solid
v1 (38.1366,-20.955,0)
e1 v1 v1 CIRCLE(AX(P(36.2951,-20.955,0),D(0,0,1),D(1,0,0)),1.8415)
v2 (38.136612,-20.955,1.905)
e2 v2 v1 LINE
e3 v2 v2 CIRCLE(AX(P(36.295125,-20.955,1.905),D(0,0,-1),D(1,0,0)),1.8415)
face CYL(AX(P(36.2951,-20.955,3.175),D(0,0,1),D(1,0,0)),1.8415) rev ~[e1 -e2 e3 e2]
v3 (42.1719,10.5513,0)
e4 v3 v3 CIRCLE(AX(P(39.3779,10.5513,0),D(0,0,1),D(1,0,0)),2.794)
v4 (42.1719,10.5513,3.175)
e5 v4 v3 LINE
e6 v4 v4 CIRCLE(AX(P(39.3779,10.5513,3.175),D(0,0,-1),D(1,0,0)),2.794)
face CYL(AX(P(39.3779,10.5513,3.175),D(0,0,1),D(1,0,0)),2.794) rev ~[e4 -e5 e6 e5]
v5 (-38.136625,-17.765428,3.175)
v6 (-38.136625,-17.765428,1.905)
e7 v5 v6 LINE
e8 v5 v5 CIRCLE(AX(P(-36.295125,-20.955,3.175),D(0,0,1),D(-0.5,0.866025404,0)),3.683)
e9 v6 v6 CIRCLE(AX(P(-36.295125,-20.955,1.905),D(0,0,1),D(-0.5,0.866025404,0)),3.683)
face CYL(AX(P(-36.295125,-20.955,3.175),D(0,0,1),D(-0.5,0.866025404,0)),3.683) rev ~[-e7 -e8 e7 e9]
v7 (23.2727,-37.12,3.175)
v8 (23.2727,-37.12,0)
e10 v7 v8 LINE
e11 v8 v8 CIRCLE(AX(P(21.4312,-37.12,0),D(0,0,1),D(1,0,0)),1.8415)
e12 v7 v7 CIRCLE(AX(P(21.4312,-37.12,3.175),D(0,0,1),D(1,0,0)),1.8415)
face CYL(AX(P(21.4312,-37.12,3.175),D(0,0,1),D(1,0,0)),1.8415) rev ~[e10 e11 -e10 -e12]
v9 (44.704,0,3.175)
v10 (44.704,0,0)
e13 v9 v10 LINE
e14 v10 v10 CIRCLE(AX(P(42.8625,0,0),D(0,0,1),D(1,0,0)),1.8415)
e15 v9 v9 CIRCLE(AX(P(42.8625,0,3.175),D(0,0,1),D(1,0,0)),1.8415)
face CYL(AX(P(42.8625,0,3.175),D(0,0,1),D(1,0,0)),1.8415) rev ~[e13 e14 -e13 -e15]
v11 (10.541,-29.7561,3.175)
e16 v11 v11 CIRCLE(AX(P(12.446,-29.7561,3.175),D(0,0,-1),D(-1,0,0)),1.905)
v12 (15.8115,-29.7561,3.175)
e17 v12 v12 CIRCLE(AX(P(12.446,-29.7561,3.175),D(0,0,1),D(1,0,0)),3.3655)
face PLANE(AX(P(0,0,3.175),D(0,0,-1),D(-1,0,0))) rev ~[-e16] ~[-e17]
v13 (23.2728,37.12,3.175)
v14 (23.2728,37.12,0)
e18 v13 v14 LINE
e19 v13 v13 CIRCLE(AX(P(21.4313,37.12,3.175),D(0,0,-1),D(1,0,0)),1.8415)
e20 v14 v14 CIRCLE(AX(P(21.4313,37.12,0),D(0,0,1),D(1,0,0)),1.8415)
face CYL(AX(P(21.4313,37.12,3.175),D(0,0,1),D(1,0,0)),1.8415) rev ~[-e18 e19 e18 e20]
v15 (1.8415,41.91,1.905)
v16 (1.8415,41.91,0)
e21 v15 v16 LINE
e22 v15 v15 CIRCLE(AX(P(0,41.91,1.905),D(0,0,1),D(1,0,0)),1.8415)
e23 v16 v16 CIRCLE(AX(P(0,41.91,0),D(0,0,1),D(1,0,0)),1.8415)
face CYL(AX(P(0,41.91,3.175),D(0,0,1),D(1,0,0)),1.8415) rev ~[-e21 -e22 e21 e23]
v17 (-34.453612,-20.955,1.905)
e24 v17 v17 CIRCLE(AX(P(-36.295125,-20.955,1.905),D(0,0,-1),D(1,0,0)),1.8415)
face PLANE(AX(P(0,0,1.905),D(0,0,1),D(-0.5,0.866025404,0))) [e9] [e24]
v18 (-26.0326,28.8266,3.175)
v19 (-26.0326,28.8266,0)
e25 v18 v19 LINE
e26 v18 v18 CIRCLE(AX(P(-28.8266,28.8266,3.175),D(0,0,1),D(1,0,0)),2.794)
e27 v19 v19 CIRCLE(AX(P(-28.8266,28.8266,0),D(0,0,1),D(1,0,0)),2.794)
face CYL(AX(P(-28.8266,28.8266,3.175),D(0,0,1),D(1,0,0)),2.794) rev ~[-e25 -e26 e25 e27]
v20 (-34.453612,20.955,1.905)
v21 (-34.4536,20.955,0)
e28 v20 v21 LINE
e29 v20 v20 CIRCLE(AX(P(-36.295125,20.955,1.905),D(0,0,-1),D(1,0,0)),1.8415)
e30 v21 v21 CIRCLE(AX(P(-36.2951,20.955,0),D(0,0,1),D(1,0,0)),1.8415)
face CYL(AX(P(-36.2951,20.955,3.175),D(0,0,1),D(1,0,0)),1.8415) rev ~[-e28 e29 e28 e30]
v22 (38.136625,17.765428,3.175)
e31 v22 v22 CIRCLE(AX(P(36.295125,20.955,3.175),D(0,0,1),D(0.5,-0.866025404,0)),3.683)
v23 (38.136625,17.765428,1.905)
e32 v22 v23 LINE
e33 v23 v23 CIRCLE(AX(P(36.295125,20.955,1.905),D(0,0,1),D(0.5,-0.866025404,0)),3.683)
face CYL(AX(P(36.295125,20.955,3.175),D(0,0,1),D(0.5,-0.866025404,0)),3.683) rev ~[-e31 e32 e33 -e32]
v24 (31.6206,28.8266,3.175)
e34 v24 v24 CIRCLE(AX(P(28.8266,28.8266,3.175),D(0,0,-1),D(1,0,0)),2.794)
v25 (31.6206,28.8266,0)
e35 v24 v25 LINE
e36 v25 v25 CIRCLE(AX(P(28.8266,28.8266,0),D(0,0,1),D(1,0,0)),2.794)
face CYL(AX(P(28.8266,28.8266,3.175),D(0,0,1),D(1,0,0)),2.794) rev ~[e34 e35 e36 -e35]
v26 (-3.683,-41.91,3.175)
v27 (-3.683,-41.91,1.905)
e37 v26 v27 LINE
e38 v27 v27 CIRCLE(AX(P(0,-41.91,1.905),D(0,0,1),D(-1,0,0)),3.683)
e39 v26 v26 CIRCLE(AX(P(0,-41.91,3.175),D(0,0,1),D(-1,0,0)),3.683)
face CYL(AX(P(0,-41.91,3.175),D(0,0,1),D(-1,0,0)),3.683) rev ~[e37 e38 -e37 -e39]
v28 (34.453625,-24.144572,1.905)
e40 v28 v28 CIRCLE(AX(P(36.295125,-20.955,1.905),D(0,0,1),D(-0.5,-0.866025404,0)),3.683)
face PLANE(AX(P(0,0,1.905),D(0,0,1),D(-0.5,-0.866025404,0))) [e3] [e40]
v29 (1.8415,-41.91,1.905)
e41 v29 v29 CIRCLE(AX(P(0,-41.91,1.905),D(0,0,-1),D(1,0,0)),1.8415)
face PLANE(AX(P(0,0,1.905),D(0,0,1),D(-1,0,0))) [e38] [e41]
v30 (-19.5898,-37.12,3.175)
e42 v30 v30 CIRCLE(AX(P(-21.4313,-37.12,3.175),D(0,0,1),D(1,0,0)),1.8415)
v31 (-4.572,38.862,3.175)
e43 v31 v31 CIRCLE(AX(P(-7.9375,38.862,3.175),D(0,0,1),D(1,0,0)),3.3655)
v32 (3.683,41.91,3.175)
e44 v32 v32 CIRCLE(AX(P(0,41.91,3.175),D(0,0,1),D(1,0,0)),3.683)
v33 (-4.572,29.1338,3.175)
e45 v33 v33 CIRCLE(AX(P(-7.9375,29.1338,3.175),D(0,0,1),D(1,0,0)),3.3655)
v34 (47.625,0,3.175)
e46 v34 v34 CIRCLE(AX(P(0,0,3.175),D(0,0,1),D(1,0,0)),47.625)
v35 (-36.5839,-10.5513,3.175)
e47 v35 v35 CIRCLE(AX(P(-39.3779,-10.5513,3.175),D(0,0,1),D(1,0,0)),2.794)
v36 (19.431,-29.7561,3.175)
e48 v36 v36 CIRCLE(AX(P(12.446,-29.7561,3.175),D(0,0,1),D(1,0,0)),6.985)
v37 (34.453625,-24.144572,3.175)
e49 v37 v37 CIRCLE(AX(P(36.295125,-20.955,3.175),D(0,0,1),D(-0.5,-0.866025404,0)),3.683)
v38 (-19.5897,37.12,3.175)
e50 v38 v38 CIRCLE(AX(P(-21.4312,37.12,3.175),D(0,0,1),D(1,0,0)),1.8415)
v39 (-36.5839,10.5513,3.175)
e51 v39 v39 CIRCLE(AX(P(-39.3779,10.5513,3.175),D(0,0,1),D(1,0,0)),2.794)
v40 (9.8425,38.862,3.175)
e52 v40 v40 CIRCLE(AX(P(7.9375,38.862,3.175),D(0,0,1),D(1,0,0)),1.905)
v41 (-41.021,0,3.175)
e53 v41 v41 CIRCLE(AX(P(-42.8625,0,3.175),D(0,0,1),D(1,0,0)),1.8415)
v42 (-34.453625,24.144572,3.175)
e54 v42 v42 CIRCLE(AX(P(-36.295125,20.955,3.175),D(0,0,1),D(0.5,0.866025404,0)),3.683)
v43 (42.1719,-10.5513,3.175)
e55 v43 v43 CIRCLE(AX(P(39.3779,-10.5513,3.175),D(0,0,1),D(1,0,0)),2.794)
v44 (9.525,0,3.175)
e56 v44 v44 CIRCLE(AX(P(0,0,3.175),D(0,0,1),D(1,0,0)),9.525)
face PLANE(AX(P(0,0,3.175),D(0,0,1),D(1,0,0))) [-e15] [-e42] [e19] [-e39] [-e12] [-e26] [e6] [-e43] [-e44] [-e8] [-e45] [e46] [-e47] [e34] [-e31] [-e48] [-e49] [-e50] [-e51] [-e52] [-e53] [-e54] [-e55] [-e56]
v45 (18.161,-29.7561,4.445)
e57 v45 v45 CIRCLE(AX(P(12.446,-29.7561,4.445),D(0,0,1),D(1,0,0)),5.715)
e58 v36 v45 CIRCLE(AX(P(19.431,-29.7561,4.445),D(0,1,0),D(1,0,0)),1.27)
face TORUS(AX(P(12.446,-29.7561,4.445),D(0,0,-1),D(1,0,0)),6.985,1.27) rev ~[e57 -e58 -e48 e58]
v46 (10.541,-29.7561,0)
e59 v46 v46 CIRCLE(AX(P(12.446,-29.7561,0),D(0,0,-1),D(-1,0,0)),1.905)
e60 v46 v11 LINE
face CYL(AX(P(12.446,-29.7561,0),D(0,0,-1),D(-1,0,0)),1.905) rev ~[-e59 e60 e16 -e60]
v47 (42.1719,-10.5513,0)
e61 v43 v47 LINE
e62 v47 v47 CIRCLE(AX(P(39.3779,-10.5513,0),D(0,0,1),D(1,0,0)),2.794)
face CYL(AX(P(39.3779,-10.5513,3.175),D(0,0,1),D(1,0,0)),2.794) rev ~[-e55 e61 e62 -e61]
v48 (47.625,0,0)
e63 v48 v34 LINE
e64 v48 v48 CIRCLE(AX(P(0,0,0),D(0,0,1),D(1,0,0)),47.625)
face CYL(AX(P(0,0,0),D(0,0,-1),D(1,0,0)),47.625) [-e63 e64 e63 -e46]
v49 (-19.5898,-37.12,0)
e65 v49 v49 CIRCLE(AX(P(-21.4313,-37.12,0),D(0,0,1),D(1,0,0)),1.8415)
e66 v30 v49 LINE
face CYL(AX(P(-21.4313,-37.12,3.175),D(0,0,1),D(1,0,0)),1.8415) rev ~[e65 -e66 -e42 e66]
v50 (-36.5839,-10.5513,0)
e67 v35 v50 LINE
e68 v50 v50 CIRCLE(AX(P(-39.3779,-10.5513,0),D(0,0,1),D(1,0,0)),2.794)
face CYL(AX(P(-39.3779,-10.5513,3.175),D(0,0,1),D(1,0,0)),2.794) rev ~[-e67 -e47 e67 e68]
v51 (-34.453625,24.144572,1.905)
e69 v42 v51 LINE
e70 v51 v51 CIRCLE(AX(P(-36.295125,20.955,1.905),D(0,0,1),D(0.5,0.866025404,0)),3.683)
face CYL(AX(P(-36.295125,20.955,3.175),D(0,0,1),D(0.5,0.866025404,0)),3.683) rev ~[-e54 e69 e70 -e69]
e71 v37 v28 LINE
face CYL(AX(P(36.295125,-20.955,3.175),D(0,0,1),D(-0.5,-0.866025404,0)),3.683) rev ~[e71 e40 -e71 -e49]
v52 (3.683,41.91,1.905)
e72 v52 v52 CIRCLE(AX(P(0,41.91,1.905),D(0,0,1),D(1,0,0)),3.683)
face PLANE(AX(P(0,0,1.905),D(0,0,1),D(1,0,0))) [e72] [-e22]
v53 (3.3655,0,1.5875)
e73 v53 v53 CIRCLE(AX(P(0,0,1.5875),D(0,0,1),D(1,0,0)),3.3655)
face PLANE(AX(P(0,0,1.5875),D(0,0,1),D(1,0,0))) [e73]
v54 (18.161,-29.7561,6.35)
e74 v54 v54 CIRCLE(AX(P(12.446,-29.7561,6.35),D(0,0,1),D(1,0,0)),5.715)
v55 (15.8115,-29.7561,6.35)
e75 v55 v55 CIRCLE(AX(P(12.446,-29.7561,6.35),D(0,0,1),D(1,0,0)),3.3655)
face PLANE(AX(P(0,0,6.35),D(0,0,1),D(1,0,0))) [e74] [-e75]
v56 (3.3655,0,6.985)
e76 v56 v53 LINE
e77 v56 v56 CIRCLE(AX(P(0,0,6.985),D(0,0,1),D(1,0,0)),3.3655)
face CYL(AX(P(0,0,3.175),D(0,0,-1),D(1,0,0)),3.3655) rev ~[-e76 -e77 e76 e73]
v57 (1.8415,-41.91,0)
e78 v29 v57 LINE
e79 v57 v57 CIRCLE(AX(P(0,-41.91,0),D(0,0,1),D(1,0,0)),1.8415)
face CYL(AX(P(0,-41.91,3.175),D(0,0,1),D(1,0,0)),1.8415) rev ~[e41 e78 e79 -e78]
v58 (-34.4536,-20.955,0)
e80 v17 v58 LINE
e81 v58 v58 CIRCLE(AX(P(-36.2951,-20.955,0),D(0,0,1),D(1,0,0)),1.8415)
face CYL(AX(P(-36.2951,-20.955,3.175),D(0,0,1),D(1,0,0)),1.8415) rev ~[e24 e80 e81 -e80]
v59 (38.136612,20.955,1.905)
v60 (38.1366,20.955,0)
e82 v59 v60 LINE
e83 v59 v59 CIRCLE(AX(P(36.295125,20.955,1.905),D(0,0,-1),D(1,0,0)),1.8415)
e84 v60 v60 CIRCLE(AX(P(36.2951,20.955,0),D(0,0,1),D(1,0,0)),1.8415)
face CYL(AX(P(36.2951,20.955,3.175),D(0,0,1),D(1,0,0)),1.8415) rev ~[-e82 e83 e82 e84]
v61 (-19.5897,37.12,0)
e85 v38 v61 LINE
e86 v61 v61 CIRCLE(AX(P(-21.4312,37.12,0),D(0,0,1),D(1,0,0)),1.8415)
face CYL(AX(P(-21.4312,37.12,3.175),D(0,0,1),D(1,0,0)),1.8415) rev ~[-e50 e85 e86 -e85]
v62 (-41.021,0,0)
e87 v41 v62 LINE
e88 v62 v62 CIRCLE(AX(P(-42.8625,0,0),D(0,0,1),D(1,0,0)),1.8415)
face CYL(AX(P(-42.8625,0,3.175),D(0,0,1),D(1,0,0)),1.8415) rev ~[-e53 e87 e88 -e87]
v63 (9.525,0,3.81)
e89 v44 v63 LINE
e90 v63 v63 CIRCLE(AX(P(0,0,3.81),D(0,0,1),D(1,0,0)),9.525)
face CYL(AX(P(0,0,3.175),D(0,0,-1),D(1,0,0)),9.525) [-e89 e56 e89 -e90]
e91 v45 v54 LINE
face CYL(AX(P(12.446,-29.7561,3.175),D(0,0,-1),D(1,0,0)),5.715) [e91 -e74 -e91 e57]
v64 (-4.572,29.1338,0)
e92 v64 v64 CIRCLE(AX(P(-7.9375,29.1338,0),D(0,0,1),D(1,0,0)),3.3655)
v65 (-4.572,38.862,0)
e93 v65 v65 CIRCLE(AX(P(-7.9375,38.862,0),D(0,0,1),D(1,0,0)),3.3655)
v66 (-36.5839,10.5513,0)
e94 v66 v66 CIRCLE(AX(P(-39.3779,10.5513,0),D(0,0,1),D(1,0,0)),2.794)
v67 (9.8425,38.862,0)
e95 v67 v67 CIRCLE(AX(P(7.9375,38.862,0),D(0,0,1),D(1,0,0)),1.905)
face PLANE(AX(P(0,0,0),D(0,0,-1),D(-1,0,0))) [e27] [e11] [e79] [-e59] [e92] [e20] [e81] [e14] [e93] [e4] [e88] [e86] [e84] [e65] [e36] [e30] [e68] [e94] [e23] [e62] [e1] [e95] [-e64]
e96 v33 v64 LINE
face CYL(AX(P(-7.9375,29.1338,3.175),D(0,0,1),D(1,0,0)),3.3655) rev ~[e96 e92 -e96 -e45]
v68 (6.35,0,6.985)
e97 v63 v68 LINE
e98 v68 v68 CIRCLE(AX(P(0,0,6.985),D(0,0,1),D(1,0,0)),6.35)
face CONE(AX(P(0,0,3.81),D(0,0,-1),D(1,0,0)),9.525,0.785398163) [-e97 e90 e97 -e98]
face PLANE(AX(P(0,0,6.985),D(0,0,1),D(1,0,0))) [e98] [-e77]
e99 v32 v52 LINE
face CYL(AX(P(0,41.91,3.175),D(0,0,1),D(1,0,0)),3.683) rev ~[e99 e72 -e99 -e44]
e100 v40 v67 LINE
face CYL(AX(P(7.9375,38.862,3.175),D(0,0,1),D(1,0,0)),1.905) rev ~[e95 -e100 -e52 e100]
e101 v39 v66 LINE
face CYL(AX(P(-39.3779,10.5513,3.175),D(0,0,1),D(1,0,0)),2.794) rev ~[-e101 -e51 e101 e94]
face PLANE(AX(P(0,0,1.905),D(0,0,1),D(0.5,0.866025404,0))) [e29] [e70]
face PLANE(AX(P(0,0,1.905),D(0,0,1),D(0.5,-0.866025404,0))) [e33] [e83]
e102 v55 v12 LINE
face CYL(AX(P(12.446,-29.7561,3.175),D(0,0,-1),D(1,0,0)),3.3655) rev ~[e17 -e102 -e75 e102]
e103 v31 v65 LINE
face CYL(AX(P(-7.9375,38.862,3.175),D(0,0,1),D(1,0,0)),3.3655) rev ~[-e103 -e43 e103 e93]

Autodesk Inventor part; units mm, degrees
ref_plane "YZ Plane" through (0, 0, 0) normal (1, 0, 0) x (0, 1, 0)
ref_plane "XZ Plane" through (0, 0, 0) normal (0, 1, 0) x (-1, 0, 0)
ref_plane "XY Plane" through (0, 0, 0) normal (0, 0, 1) x (1, 0, 0)
sketch "Sketch1" plane through (0, 0, 0) normal (0, 0, 1) x (1, 0, 0)
  circle A0 centre (0, 0) radius 47.625
  dimension "d0" = 95.25
extrude "Extrusion1" add sketch "Sketch1" along normal blind 3.175
sketch "Sketch4" plane through (0, 0, 3.175) normal (0, 0, 1) x (1, 0, 0)
  circle A0 centre (12.446, -29.7561) radius 3.3655
  point P0 (0, 0)
  dimension "d16" = 6.731
  dimension "d17" = 12.446
  dimension "d18" = 29.7561
extrude "Extrusion4" cut sketch "Sketch4" against normal blind 3.175
sketch "Sketch6" plane through (0, 0, 3.175) normal (0, 0, 1) x (1, 0, 0)
  circle A0 centre (0, 0) radius 3.3655
  circle A1 centre (0, 0) radius 9.525
  circle A2 centre (0, 0) radius 47.625 projected
  circle A3 centre (12.446, -29.7561) radius 3.3655 projected
  line L0 (0, 0) -> (12.446, -29.7561) construction
  dimension "d32" = 6.731
  dimension "d33" = 19.05
  dimension "d191" = 32.2541
extrude "Extrusion7" add sketch "Sketch6" along normal blind 3.81 contours A1
sketch "Sketch7" plane through (0, 0, 3.175) normal (0, 0, 1) x (1, 0, 0)
  line L0 (0, 0) -> (21.4313, 37.12)
  line L1 (0, 0) -> (42.8625, 0) construction
  circle A0 centre (21.4313, 37.12) radius 1.8415
  circle A1 centre (-21.4312, 37.12) radius 1.8415
  circle A2 centre (-42.8625, 0) radius 1.8415
  circle A3 centre (-21.4313, -37.12) radius 1.8415
  circle A4 centre (21.4312, -37.12) radius 1.8415
  circle A5 centre (42.8625, 0) radius 1.8415
  dimension "d39" = 42.8625
  dimension "d40" = 60
  dimension "d41" = 3.683
  dimension "d44" = 360
extrude "Extrusion10" cut sketch "Sketch7" against normal through all
sketch "Sketch9" plane through (0, 0, 3.175) normal (0, 0, 1) x (1, 0, 0)
  circle A0 centre (0, 0) radius 3.3655 projected
  line L0 (0, 0) -> (0, 41.91)
  circle A1 centre (0, 41.91) radius 1.8415
  circle A2 centre (-36.2951, 20.955) radius 1.8415
  circle A3 centre (-36.2951, -20.955) radius 1.8415
  circle A4 centre (0, -41.91) radius 1.8415
  circle A5 centre (36.2951, -20.955) radius 1.8415
  circle A6 centre (36.2951, 20.955) radius 1.8415
  dimension "d61" = 41.91
  dimension "d62" = 3.683
  dimension "d65" = 360
extrude "Extrusion12" cut sketch "Sketch9" against normal blind 25.4 contours A1 | A2 | A3 | A4 | A5 | A6
sketch "Sketch17" plane through (0, 0, 3.175) normal (0, 0, 1) x (1, 0, 0)
  line L0 (0, 0) -> (39.3779, 10.5513)
  line L1 (0, 0) -> (40.767, 0) construction
  circle A0 centre (39.3779, 10.5513) radius 2.794
  line L2 (0, 0) -> (0, 17.3134)
  circle A1 centre (39.3779, -10.5513) radius 2.794
  circle A2 centre (-39.3779, 10.5513) radius 2.794
  circle A3 centre (-39.3779, -10.5513) radius 2.794
  line L3 (0, 0) -> (28.8266, 28.8266)
  line L4 (0, 0) -> (40.767, 0) construction
  circle A4 centre (28.8266, 28.8266) radius 2.794
  circle A5 centre (-28.8266, 28.8266) radius 2.794
  dimension "d144" = 40.767
  dimension "d145" = 15
  dimension "d146" = 5.588
  dimension "d149" = 40.767
  dimension "d150" = 45
  dimension "d151" = 5.588
extrude "Extrusion22" cut sketch "Sketch17" against normal blind 25.4 contours A0 | A1 | A2 | A3
extrude "Extrusion23" cut sketch "Sketch17" against normal blind 25.4 contours A4 | A5
sketch "Sketch22" plane through (0, 0, 3.175) normal (0, 0, 1) x (1, 0, 0)
  circle A0 centre (-7.9375, 29.1338) radius 3.3655
  point P0 (0, 0)
  dimension "d166" = 6.731
  dimension "d167" = 7.9375
  dimension "d168" = 29.1338
extrude "Extrusion26" cut sketch "Sketch22" against normal through all
sketch "Sketch23" plane through (0, 0, 3.175) normal (0, 0, 1) x (1, 0, 0)
  circle A0 centre (0, 0) radius 3.3655 projected
extrude "Extrusion27" cut sketch "Sketch23" against normal blind 1.5875
chamfer "Chamfer6" distance 3.175 angle 45 1 edges at (-9.525, 0, 6.985)
sketch "Sketch24" plane through (0, 0, 3.175) normal (0, 0, 1) x (1, 0, 0)
  circle A0 centre (12.446, -29.7561) radius 3.3655 projected
  circle A1 centre (12.446, -29.7561) radius 5.715
  point P0 (0, 0)
  dimension "d176" = 11.43
extrude "Extrusion28" add sketch "Sketch24" along normal blind 3.175
sketch "Sketch25" plane through (0, 0, 0) normal (0, 0, -1) x (-1, 0, 0)
  circle A0 centre (-12.446, -29.7561) radius 3.3655 projected
  circle A1 centre (-12.446, -29.7561) radius 1.905
  point P0 (0, 0)
  dimension "d179" = 3.81
extrude "Extrusion29" add sketch "Sketch25" against normal blind 3.175
fillet "Fillet3" radius 1.27 1 edges at (6.731, -29.7561, 3.175)
sketch "Sketch26" plane through (0, 0, 3.175) normal (0, 0, 1) x (1, 0, 0)
  circle A0 centre (-7.9375, 38.862) radius 3.3655
  circle A1 centre (7.9375, 38.862) radius 1.905
  line L0 (7.9375, 38.862) -> (-7.9375, 38.862) construction
  circle A2 centre (-7.9375, 29.1338) radius 3.3655 construction
  line L1 (-7.9375, 29.1338) -> (-7.9375, 38.862) construction
  point P0 (0, 0)
  point P1 (0, 38.862)
  dimension "d183" = 6.731
  dimension "d184" = 3.81
  dimension "d185" = 38.862
  dimension "d186" = 15.875
  dimension "d189" = 9.7282
extrude "Extrusion30" cut sketch "Sketch26" against normal through all
sketch "Sketch27" plane through (0, 0, 3.175) normal (0, 0, 1) x (1, 0, 0)
  line L0 (-24.0461, 24.2224) -> (-19.7824, 24.2224) construction
  line L1 (-19.7824, 24.2224) -> (-19.7824, 20.2457) construction
  line L2 (-19.7824, 20.2457) -> (-24.0461, 20.2457) construction
  line L3 (-24.0461, 20.2457) -> (-24.0461, 24.2224) construction
  line L4 (25.5336, -15.2981) -> (30.1056, -15.2981) construction
  line L5 (30.1056, -15.2981) -> (30.1056, -17.0126) construction
  line L6 (30.1056, -17.0126) -> (25.5336, -17.0126) construction
  line L7 (25.5336, -17.0126) -> (25.5336, -15.2981) construction
sketch "Sketch29" plane through (0, 0, 3.175) normal (0, 0, 1) x (1, 0, 0)
  circle A0 centre (0, 41.91) radius 1.8415 projected
  circle A1 centre (0, 41.91) radius 3.683
  point P0 (0, 0)
  dimension "d192" = 7.366
extrude "Extrusion31" cut sketch "Sketch29" against normal blind 1.27
pattern_circular "Circular Pattern1" count 6 over 360 about axis through (0, 0, 0) along (0, 0, 1) of "Extrusion31"
sketch "Sketch21" plane through (0, 0, 0) normal (0, 0, -1) x (-1, 0, 0)
  circle A0 centre (0, 0) radius 47.625
  circle A1 centre (0, 0) radius 9.525 projected
  circle A2 centre (0, 0) radius 47.1805
  dimension "d162" = 95.25
  dimension "d163" = 94.361
extrude "PRINT_FEATURE_1" [suppressed]
properties part number "aftSpoolSectionSealingWall" material "ABS Plastic"
